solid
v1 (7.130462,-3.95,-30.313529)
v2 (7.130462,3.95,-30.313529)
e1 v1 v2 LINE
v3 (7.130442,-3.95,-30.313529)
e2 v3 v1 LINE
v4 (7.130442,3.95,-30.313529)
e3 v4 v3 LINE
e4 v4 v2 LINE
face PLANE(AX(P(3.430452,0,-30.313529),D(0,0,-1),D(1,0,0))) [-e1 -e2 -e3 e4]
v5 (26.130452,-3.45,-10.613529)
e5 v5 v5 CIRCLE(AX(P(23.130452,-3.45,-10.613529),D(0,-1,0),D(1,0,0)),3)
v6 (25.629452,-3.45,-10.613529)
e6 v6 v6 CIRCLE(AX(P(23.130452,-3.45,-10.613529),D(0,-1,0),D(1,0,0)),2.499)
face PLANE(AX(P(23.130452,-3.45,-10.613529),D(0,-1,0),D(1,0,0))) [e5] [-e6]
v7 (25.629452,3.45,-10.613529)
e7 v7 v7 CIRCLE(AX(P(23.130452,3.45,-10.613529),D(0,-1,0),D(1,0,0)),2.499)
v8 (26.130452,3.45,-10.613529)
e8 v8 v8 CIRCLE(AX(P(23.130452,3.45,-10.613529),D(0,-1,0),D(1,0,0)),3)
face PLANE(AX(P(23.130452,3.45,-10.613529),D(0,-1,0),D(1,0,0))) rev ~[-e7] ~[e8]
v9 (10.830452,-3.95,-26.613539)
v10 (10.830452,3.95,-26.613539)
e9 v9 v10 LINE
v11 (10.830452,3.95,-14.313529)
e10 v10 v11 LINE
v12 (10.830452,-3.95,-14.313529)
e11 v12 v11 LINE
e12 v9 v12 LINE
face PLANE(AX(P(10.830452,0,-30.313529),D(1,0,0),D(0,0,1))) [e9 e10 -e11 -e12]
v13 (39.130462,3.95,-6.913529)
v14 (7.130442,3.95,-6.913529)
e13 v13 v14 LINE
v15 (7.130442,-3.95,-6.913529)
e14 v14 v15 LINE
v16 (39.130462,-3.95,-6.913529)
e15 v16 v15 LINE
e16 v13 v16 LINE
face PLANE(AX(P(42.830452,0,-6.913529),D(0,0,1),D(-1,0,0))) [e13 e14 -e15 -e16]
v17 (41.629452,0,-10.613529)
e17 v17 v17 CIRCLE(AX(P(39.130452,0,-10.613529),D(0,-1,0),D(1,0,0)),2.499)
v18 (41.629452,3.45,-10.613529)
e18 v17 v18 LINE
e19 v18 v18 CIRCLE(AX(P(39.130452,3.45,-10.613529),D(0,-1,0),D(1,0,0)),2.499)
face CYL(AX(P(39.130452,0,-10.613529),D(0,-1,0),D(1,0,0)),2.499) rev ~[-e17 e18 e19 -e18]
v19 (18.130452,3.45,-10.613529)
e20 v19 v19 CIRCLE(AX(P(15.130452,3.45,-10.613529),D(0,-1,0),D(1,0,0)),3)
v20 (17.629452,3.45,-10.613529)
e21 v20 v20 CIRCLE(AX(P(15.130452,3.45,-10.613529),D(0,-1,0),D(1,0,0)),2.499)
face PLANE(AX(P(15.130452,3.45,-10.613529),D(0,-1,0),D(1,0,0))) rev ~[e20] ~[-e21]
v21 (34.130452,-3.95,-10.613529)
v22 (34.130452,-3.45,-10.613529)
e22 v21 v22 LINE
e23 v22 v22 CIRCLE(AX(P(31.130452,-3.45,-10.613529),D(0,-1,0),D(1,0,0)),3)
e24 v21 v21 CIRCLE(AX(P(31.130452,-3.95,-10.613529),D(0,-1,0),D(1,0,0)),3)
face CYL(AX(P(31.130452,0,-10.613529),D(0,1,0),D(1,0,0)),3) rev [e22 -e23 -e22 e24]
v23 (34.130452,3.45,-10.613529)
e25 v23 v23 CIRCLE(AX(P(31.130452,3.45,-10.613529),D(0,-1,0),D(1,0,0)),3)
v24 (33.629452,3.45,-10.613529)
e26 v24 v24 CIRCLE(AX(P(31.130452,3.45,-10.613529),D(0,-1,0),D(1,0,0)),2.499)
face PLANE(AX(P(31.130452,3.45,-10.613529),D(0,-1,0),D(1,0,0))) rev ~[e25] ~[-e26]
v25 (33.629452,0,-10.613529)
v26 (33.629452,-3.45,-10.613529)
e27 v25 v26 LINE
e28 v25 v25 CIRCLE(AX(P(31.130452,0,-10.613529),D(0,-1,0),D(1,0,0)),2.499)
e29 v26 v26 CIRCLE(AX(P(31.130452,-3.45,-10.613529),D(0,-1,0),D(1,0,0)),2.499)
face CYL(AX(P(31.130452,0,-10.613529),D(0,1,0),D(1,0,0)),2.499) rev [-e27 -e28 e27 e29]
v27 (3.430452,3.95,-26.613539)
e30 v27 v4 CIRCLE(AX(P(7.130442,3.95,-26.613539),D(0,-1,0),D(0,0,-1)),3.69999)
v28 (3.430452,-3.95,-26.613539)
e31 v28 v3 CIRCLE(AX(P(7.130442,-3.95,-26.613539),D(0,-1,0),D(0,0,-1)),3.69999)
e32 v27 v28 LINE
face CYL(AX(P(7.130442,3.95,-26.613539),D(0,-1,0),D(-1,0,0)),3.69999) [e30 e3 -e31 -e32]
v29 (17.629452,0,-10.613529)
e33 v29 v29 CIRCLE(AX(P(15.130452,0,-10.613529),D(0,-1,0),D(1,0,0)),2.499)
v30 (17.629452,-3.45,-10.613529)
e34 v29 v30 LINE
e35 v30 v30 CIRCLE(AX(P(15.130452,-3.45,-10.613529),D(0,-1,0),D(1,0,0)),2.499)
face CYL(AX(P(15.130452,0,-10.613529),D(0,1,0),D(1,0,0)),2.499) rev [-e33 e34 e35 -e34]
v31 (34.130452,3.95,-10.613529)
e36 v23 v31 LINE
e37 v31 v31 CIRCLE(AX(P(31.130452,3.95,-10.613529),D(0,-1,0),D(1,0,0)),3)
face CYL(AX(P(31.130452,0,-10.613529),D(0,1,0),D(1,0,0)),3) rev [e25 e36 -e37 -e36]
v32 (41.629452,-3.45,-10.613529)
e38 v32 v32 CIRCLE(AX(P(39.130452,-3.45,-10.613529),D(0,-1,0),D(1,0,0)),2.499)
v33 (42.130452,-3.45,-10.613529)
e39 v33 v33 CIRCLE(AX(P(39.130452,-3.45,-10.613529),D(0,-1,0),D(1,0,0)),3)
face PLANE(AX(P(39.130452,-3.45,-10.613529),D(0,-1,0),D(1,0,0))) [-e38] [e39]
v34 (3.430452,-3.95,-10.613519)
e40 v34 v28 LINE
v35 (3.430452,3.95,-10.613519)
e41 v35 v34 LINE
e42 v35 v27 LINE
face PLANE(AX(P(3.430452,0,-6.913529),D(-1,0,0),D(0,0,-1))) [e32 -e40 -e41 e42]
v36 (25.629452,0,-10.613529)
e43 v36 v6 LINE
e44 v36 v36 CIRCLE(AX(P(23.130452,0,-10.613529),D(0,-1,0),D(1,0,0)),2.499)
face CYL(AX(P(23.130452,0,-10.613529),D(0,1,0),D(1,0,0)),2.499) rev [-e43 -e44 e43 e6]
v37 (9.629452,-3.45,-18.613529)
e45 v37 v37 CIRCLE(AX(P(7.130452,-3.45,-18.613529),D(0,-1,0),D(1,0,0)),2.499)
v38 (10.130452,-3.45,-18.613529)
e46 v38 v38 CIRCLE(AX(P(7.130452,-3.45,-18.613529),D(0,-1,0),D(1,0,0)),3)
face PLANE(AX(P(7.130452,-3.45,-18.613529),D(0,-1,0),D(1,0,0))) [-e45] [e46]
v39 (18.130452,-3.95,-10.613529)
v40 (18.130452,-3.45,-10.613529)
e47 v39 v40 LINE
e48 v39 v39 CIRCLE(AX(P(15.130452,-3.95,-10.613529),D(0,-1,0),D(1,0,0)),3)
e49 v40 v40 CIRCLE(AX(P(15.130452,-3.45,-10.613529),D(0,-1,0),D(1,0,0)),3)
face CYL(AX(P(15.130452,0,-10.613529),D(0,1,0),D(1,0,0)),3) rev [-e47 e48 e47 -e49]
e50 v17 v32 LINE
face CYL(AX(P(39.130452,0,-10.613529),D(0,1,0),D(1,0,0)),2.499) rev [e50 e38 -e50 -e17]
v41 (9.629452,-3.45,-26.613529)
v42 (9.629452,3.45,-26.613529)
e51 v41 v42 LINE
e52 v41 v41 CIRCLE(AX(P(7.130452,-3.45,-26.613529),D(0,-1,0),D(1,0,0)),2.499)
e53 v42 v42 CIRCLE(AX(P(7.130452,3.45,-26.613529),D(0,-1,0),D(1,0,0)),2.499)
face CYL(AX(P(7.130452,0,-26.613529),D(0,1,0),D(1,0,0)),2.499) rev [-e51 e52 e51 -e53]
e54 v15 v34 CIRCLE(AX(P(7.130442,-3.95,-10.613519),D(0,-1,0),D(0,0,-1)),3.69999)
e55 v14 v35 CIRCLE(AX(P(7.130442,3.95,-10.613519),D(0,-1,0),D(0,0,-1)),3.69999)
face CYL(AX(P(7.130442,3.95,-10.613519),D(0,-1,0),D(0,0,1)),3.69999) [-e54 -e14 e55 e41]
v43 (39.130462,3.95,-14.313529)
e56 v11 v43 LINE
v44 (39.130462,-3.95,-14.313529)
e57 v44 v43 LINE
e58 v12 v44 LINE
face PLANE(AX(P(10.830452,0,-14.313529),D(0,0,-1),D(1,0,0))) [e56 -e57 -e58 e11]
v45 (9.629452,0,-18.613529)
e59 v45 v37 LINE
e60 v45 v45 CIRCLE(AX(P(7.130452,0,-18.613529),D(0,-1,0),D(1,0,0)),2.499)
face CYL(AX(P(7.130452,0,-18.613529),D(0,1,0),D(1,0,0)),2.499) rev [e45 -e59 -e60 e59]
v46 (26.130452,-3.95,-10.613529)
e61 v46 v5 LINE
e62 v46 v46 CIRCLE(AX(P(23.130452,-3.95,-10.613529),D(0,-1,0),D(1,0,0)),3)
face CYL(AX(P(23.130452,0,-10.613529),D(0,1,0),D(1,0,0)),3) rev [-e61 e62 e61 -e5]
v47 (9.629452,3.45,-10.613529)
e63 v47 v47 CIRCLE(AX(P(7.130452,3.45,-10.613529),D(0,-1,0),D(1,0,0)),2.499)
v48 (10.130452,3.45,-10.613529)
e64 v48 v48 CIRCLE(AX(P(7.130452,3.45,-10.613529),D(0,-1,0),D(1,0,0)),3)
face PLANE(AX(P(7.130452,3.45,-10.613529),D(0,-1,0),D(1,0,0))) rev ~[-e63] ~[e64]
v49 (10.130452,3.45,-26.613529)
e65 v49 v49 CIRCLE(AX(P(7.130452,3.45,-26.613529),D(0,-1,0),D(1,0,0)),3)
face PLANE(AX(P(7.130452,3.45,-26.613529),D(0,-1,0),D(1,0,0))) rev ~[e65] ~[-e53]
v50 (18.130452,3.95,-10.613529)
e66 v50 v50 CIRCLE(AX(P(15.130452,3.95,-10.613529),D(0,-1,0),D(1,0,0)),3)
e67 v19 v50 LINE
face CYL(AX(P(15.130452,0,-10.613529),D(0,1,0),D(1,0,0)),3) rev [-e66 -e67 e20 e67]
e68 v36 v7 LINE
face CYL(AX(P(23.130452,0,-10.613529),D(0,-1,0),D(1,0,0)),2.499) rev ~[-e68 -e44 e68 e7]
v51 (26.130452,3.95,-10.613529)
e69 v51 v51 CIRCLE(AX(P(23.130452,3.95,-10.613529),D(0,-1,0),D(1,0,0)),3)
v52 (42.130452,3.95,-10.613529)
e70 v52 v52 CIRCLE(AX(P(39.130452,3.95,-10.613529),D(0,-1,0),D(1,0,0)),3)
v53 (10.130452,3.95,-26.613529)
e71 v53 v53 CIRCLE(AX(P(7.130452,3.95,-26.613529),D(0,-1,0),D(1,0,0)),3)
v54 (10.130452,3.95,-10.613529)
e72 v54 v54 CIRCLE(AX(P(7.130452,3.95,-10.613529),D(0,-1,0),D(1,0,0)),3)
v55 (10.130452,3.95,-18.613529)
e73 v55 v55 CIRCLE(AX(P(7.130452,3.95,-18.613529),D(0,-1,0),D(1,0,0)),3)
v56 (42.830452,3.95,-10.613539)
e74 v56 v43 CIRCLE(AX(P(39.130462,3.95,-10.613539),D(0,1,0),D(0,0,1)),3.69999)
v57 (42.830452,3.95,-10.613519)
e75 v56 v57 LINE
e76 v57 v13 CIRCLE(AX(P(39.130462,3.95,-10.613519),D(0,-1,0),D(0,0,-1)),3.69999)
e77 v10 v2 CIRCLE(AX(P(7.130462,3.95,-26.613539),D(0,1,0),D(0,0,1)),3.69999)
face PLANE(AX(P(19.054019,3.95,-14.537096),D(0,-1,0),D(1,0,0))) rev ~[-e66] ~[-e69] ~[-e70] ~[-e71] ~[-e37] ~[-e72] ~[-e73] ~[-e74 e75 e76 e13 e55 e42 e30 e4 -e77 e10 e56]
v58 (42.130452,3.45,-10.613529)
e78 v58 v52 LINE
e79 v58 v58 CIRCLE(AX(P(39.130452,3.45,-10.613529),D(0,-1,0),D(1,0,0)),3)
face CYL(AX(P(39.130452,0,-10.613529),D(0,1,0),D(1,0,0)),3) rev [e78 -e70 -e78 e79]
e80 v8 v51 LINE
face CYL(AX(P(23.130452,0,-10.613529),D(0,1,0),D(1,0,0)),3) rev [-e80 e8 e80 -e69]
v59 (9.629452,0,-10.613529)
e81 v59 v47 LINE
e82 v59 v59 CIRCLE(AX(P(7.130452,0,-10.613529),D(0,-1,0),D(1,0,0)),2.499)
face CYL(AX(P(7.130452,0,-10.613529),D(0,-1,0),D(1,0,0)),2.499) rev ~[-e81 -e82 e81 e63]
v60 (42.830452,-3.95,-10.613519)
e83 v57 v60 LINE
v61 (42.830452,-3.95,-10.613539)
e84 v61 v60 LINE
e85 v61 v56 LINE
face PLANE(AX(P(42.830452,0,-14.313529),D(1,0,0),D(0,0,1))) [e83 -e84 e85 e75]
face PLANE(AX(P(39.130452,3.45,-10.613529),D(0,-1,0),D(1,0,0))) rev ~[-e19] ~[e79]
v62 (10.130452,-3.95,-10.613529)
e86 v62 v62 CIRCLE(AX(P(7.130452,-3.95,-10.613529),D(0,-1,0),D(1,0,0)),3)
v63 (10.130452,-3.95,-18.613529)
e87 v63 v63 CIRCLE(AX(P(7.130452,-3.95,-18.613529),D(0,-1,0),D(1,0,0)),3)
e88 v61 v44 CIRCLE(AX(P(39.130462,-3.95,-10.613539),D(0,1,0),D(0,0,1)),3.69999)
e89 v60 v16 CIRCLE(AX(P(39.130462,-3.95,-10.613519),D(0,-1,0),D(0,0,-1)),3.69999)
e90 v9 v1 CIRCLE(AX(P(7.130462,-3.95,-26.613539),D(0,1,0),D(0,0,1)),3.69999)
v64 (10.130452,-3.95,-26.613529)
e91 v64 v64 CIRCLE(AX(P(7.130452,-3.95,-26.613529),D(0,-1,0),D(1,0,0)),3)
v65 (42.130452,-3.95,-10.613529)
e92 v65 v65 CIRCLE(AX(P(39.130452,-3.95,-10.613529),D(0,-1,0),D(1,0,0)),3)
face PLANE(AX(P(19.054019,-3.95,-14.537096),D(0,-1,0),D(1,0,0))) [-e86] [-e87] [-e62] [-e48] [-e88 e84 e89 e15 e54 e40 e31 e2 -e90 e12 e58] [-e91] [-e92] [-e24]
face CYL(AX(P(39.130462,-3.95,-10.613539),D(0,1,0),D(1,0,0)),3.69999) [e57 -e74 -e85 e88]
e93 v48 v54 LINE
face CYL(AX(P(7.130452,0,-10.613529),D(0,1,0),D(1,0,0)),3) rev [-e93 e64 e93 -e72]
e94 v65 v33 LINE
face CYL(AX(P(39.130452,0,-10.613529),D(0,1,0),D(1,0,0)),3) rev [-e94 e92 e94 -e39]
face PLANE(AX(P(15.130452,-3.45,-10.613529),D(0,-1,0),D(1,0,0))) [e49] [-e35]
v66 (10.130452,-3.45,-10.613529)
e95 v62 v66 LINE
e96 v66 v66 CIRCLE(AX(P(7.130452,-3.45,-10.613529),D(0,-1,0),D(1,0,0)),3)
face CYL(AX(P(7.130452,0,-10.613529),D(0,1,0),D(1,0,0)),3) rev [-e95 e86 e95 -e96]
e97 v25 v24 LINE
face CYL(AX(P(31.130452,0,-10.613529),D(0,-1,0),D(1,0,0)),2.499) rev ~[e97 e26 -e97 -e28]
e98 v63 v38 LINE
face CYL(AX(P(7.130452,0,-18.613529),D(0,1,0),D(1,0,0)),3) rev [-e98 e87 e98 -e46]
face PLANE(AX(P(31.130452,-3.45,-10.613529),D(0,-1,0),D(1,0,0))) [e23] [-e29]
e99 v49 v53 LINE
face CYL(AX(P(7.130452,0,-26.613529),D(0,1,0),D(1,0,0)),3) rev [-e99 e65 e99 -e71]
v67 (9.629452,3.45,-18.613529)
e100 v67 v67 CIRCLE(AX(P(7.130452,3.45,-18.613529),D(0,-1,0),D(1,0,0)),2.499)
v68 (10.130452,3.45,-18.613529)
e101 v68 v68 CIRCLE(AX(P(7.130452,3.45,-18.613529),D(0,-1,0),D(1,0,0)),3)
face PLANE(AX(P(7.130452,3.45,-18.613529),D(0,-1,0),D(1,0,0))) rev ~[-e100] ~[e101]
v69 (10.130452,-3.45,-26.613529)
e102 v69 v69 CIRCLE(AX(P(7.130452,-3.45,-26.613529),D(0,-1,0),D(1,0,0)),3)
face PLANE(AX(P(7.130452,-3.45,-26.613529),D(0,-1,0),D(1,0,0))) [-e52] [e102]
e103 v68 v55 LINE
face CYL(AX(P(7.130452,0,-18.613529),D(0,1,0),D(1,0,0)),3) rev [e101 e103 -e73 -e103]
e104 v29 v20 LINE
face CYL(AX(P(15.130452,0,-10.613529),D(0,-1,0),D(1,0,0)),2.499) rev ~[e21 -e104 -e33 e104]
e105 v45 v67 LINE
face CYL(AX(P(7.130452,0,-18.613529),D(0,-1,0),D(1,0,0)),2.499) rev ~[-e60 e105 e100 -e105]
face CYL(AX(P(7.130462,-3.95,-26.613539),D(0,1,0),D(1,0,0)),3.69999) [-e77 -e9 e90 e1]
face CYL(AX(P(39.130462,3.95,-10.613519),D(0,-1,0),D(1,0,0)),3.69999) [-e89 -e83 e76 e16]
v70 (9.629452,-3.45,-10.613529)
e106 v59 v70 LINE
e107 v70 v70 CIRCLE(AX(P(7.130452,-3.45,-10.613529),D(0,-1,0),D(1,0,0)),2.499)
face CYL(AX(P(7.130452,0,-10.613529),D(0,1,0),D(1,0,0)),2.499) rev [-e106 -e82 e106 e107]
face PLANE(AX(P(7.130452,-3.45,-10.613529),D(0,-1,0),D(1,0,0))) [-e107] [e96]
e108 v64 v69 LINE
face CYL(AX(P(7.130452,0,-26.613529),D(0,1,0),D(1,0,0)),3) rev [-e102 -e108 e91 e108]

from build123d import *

# Parameters (mm, degrees)
F0_R     = 3
F1_DEPTH = 3.95
F0_R_2   = 2.499
F2_DEPTH = 3.45
F3_R     = 3.69999


# Not quite as in the source:
# - a fillet or chamfer is up to 0.001 mm smaller than in the source, because OpenCascade refuses the exact size


with BuildPart() as f1:
    # F0 (on Front) → F1 (new body, symmetric)
    with BuildSketch(Plane.XZ):
        Polygon((42.8304520275, -14.3135290742), (42.8304520275, -6.9135290742), (3.4304520275, -6.9135290742), (3.4304520275, -30.3135290742), (10.8304520275, -30.3135290742), (10.8304520275, -14.3135290742), align=None)
        with Locations((7.1304520275, -26.6135290742)):
            Circle(F0_R, mode=Mode.SUBTRACT)
        with Locations((7.1304520275, -18.6135290742)):
            Circle(F0_R, mode=Mode.SUBTRACT)
        with Locations((7.1304520275, -10.6135290742)):
            Circle(F0_R, mode=Mode.SUBTRACT)
        with Locations((15.1304520275, -10.6135290742)):
            Circle(F0_R, mode=Mode.SUBTRACT)
        with Locations((23.1304520275, -10.6135290742)):
            Circle(F0_R, mode=Mode.SUBTRACT)
        with Locations((31.1304520275, -10.6135290742)):
            Circle(F0_R, mode=Mode.SUBTRACT)
        with Locations((39.1304520275, -10.6135290742)):
            Circle(F0_R, mode=Mode.SUBTRACT)
    extrude(amount=F1_DEPTH, both=True)

    # F0 (on Front) → F2 (join, symmetric)
    with BuildSketch(Plane.XZ):
        with Locations((39.1304520275, -10.6135290742)):
            Circle(F0_R)
        with Locations((39.1304520275, -10.6135290742)):
            Circle(F0_R_2, mode=Mode.SUBTRACT)
        with Locations((31.1304520275, -10.6135290742)):
            Circle(F0_R)
        with Locations((31.1304520275, -10.6135290742)):
            Circle(F0_R_2, mode=Mode.SUBTRACT)
        with Locations((23.1304520275, -10.6135290742)):
            Circle(F0_R)
        with Locations((23.1304520275, -10.6135290742)):
            Circle(F0_R_2, mode=Mode.SUBTRACT)
        with Locations((15.1304520275, -10.6135290742)):
            Circle(F0_R)
        with Locations((15.1304520275, -10.6135290742)):
            Circle(F0_R_2, mode=Mode.SUBTRACT)
        with Locations((7.1304520275, -10.6135290742)):
            Circle(F0_R)
        with Locations((7.1304520275, -10.6135290742)):
            Circle(F0_R_2, mode=Mode.SUBTRACT)
        with Locations((7.1304520275, -18.6135290742)):
            Circle(F0_R)
        with Locations((7.1304520275, -18.6135290742)):
            Circle(F0_R_2, mode=Mode.SUBTRACT)
        with Locations((7.1304520275, -26.6135290742)):
            Circle(F0_R)
        with Locations((7.1304520275, -26.6135290742)):
            Circle(F0_R_2, mode=Mode.SUBTRACT)
    extrude(amount=F2_DEPTH, both=True)

    # F3 (radius 3.7 in the source; OpenCascade refuses exactly that, so slightly less here)
    f3_edges = [f1.edges().sort_by_distance(p)[0] for p in [
        (42.830452, 0, -6.913529),
        (42.830452, 0, -14.313529),
        (10.830452, 0, -30.313529),
        (3.430452, 0, -30.313529),
        (3.430452, 0, -6.913529),
    ]]
    fillet(f3_edges, radius=F3_R)


solid = f1.part
